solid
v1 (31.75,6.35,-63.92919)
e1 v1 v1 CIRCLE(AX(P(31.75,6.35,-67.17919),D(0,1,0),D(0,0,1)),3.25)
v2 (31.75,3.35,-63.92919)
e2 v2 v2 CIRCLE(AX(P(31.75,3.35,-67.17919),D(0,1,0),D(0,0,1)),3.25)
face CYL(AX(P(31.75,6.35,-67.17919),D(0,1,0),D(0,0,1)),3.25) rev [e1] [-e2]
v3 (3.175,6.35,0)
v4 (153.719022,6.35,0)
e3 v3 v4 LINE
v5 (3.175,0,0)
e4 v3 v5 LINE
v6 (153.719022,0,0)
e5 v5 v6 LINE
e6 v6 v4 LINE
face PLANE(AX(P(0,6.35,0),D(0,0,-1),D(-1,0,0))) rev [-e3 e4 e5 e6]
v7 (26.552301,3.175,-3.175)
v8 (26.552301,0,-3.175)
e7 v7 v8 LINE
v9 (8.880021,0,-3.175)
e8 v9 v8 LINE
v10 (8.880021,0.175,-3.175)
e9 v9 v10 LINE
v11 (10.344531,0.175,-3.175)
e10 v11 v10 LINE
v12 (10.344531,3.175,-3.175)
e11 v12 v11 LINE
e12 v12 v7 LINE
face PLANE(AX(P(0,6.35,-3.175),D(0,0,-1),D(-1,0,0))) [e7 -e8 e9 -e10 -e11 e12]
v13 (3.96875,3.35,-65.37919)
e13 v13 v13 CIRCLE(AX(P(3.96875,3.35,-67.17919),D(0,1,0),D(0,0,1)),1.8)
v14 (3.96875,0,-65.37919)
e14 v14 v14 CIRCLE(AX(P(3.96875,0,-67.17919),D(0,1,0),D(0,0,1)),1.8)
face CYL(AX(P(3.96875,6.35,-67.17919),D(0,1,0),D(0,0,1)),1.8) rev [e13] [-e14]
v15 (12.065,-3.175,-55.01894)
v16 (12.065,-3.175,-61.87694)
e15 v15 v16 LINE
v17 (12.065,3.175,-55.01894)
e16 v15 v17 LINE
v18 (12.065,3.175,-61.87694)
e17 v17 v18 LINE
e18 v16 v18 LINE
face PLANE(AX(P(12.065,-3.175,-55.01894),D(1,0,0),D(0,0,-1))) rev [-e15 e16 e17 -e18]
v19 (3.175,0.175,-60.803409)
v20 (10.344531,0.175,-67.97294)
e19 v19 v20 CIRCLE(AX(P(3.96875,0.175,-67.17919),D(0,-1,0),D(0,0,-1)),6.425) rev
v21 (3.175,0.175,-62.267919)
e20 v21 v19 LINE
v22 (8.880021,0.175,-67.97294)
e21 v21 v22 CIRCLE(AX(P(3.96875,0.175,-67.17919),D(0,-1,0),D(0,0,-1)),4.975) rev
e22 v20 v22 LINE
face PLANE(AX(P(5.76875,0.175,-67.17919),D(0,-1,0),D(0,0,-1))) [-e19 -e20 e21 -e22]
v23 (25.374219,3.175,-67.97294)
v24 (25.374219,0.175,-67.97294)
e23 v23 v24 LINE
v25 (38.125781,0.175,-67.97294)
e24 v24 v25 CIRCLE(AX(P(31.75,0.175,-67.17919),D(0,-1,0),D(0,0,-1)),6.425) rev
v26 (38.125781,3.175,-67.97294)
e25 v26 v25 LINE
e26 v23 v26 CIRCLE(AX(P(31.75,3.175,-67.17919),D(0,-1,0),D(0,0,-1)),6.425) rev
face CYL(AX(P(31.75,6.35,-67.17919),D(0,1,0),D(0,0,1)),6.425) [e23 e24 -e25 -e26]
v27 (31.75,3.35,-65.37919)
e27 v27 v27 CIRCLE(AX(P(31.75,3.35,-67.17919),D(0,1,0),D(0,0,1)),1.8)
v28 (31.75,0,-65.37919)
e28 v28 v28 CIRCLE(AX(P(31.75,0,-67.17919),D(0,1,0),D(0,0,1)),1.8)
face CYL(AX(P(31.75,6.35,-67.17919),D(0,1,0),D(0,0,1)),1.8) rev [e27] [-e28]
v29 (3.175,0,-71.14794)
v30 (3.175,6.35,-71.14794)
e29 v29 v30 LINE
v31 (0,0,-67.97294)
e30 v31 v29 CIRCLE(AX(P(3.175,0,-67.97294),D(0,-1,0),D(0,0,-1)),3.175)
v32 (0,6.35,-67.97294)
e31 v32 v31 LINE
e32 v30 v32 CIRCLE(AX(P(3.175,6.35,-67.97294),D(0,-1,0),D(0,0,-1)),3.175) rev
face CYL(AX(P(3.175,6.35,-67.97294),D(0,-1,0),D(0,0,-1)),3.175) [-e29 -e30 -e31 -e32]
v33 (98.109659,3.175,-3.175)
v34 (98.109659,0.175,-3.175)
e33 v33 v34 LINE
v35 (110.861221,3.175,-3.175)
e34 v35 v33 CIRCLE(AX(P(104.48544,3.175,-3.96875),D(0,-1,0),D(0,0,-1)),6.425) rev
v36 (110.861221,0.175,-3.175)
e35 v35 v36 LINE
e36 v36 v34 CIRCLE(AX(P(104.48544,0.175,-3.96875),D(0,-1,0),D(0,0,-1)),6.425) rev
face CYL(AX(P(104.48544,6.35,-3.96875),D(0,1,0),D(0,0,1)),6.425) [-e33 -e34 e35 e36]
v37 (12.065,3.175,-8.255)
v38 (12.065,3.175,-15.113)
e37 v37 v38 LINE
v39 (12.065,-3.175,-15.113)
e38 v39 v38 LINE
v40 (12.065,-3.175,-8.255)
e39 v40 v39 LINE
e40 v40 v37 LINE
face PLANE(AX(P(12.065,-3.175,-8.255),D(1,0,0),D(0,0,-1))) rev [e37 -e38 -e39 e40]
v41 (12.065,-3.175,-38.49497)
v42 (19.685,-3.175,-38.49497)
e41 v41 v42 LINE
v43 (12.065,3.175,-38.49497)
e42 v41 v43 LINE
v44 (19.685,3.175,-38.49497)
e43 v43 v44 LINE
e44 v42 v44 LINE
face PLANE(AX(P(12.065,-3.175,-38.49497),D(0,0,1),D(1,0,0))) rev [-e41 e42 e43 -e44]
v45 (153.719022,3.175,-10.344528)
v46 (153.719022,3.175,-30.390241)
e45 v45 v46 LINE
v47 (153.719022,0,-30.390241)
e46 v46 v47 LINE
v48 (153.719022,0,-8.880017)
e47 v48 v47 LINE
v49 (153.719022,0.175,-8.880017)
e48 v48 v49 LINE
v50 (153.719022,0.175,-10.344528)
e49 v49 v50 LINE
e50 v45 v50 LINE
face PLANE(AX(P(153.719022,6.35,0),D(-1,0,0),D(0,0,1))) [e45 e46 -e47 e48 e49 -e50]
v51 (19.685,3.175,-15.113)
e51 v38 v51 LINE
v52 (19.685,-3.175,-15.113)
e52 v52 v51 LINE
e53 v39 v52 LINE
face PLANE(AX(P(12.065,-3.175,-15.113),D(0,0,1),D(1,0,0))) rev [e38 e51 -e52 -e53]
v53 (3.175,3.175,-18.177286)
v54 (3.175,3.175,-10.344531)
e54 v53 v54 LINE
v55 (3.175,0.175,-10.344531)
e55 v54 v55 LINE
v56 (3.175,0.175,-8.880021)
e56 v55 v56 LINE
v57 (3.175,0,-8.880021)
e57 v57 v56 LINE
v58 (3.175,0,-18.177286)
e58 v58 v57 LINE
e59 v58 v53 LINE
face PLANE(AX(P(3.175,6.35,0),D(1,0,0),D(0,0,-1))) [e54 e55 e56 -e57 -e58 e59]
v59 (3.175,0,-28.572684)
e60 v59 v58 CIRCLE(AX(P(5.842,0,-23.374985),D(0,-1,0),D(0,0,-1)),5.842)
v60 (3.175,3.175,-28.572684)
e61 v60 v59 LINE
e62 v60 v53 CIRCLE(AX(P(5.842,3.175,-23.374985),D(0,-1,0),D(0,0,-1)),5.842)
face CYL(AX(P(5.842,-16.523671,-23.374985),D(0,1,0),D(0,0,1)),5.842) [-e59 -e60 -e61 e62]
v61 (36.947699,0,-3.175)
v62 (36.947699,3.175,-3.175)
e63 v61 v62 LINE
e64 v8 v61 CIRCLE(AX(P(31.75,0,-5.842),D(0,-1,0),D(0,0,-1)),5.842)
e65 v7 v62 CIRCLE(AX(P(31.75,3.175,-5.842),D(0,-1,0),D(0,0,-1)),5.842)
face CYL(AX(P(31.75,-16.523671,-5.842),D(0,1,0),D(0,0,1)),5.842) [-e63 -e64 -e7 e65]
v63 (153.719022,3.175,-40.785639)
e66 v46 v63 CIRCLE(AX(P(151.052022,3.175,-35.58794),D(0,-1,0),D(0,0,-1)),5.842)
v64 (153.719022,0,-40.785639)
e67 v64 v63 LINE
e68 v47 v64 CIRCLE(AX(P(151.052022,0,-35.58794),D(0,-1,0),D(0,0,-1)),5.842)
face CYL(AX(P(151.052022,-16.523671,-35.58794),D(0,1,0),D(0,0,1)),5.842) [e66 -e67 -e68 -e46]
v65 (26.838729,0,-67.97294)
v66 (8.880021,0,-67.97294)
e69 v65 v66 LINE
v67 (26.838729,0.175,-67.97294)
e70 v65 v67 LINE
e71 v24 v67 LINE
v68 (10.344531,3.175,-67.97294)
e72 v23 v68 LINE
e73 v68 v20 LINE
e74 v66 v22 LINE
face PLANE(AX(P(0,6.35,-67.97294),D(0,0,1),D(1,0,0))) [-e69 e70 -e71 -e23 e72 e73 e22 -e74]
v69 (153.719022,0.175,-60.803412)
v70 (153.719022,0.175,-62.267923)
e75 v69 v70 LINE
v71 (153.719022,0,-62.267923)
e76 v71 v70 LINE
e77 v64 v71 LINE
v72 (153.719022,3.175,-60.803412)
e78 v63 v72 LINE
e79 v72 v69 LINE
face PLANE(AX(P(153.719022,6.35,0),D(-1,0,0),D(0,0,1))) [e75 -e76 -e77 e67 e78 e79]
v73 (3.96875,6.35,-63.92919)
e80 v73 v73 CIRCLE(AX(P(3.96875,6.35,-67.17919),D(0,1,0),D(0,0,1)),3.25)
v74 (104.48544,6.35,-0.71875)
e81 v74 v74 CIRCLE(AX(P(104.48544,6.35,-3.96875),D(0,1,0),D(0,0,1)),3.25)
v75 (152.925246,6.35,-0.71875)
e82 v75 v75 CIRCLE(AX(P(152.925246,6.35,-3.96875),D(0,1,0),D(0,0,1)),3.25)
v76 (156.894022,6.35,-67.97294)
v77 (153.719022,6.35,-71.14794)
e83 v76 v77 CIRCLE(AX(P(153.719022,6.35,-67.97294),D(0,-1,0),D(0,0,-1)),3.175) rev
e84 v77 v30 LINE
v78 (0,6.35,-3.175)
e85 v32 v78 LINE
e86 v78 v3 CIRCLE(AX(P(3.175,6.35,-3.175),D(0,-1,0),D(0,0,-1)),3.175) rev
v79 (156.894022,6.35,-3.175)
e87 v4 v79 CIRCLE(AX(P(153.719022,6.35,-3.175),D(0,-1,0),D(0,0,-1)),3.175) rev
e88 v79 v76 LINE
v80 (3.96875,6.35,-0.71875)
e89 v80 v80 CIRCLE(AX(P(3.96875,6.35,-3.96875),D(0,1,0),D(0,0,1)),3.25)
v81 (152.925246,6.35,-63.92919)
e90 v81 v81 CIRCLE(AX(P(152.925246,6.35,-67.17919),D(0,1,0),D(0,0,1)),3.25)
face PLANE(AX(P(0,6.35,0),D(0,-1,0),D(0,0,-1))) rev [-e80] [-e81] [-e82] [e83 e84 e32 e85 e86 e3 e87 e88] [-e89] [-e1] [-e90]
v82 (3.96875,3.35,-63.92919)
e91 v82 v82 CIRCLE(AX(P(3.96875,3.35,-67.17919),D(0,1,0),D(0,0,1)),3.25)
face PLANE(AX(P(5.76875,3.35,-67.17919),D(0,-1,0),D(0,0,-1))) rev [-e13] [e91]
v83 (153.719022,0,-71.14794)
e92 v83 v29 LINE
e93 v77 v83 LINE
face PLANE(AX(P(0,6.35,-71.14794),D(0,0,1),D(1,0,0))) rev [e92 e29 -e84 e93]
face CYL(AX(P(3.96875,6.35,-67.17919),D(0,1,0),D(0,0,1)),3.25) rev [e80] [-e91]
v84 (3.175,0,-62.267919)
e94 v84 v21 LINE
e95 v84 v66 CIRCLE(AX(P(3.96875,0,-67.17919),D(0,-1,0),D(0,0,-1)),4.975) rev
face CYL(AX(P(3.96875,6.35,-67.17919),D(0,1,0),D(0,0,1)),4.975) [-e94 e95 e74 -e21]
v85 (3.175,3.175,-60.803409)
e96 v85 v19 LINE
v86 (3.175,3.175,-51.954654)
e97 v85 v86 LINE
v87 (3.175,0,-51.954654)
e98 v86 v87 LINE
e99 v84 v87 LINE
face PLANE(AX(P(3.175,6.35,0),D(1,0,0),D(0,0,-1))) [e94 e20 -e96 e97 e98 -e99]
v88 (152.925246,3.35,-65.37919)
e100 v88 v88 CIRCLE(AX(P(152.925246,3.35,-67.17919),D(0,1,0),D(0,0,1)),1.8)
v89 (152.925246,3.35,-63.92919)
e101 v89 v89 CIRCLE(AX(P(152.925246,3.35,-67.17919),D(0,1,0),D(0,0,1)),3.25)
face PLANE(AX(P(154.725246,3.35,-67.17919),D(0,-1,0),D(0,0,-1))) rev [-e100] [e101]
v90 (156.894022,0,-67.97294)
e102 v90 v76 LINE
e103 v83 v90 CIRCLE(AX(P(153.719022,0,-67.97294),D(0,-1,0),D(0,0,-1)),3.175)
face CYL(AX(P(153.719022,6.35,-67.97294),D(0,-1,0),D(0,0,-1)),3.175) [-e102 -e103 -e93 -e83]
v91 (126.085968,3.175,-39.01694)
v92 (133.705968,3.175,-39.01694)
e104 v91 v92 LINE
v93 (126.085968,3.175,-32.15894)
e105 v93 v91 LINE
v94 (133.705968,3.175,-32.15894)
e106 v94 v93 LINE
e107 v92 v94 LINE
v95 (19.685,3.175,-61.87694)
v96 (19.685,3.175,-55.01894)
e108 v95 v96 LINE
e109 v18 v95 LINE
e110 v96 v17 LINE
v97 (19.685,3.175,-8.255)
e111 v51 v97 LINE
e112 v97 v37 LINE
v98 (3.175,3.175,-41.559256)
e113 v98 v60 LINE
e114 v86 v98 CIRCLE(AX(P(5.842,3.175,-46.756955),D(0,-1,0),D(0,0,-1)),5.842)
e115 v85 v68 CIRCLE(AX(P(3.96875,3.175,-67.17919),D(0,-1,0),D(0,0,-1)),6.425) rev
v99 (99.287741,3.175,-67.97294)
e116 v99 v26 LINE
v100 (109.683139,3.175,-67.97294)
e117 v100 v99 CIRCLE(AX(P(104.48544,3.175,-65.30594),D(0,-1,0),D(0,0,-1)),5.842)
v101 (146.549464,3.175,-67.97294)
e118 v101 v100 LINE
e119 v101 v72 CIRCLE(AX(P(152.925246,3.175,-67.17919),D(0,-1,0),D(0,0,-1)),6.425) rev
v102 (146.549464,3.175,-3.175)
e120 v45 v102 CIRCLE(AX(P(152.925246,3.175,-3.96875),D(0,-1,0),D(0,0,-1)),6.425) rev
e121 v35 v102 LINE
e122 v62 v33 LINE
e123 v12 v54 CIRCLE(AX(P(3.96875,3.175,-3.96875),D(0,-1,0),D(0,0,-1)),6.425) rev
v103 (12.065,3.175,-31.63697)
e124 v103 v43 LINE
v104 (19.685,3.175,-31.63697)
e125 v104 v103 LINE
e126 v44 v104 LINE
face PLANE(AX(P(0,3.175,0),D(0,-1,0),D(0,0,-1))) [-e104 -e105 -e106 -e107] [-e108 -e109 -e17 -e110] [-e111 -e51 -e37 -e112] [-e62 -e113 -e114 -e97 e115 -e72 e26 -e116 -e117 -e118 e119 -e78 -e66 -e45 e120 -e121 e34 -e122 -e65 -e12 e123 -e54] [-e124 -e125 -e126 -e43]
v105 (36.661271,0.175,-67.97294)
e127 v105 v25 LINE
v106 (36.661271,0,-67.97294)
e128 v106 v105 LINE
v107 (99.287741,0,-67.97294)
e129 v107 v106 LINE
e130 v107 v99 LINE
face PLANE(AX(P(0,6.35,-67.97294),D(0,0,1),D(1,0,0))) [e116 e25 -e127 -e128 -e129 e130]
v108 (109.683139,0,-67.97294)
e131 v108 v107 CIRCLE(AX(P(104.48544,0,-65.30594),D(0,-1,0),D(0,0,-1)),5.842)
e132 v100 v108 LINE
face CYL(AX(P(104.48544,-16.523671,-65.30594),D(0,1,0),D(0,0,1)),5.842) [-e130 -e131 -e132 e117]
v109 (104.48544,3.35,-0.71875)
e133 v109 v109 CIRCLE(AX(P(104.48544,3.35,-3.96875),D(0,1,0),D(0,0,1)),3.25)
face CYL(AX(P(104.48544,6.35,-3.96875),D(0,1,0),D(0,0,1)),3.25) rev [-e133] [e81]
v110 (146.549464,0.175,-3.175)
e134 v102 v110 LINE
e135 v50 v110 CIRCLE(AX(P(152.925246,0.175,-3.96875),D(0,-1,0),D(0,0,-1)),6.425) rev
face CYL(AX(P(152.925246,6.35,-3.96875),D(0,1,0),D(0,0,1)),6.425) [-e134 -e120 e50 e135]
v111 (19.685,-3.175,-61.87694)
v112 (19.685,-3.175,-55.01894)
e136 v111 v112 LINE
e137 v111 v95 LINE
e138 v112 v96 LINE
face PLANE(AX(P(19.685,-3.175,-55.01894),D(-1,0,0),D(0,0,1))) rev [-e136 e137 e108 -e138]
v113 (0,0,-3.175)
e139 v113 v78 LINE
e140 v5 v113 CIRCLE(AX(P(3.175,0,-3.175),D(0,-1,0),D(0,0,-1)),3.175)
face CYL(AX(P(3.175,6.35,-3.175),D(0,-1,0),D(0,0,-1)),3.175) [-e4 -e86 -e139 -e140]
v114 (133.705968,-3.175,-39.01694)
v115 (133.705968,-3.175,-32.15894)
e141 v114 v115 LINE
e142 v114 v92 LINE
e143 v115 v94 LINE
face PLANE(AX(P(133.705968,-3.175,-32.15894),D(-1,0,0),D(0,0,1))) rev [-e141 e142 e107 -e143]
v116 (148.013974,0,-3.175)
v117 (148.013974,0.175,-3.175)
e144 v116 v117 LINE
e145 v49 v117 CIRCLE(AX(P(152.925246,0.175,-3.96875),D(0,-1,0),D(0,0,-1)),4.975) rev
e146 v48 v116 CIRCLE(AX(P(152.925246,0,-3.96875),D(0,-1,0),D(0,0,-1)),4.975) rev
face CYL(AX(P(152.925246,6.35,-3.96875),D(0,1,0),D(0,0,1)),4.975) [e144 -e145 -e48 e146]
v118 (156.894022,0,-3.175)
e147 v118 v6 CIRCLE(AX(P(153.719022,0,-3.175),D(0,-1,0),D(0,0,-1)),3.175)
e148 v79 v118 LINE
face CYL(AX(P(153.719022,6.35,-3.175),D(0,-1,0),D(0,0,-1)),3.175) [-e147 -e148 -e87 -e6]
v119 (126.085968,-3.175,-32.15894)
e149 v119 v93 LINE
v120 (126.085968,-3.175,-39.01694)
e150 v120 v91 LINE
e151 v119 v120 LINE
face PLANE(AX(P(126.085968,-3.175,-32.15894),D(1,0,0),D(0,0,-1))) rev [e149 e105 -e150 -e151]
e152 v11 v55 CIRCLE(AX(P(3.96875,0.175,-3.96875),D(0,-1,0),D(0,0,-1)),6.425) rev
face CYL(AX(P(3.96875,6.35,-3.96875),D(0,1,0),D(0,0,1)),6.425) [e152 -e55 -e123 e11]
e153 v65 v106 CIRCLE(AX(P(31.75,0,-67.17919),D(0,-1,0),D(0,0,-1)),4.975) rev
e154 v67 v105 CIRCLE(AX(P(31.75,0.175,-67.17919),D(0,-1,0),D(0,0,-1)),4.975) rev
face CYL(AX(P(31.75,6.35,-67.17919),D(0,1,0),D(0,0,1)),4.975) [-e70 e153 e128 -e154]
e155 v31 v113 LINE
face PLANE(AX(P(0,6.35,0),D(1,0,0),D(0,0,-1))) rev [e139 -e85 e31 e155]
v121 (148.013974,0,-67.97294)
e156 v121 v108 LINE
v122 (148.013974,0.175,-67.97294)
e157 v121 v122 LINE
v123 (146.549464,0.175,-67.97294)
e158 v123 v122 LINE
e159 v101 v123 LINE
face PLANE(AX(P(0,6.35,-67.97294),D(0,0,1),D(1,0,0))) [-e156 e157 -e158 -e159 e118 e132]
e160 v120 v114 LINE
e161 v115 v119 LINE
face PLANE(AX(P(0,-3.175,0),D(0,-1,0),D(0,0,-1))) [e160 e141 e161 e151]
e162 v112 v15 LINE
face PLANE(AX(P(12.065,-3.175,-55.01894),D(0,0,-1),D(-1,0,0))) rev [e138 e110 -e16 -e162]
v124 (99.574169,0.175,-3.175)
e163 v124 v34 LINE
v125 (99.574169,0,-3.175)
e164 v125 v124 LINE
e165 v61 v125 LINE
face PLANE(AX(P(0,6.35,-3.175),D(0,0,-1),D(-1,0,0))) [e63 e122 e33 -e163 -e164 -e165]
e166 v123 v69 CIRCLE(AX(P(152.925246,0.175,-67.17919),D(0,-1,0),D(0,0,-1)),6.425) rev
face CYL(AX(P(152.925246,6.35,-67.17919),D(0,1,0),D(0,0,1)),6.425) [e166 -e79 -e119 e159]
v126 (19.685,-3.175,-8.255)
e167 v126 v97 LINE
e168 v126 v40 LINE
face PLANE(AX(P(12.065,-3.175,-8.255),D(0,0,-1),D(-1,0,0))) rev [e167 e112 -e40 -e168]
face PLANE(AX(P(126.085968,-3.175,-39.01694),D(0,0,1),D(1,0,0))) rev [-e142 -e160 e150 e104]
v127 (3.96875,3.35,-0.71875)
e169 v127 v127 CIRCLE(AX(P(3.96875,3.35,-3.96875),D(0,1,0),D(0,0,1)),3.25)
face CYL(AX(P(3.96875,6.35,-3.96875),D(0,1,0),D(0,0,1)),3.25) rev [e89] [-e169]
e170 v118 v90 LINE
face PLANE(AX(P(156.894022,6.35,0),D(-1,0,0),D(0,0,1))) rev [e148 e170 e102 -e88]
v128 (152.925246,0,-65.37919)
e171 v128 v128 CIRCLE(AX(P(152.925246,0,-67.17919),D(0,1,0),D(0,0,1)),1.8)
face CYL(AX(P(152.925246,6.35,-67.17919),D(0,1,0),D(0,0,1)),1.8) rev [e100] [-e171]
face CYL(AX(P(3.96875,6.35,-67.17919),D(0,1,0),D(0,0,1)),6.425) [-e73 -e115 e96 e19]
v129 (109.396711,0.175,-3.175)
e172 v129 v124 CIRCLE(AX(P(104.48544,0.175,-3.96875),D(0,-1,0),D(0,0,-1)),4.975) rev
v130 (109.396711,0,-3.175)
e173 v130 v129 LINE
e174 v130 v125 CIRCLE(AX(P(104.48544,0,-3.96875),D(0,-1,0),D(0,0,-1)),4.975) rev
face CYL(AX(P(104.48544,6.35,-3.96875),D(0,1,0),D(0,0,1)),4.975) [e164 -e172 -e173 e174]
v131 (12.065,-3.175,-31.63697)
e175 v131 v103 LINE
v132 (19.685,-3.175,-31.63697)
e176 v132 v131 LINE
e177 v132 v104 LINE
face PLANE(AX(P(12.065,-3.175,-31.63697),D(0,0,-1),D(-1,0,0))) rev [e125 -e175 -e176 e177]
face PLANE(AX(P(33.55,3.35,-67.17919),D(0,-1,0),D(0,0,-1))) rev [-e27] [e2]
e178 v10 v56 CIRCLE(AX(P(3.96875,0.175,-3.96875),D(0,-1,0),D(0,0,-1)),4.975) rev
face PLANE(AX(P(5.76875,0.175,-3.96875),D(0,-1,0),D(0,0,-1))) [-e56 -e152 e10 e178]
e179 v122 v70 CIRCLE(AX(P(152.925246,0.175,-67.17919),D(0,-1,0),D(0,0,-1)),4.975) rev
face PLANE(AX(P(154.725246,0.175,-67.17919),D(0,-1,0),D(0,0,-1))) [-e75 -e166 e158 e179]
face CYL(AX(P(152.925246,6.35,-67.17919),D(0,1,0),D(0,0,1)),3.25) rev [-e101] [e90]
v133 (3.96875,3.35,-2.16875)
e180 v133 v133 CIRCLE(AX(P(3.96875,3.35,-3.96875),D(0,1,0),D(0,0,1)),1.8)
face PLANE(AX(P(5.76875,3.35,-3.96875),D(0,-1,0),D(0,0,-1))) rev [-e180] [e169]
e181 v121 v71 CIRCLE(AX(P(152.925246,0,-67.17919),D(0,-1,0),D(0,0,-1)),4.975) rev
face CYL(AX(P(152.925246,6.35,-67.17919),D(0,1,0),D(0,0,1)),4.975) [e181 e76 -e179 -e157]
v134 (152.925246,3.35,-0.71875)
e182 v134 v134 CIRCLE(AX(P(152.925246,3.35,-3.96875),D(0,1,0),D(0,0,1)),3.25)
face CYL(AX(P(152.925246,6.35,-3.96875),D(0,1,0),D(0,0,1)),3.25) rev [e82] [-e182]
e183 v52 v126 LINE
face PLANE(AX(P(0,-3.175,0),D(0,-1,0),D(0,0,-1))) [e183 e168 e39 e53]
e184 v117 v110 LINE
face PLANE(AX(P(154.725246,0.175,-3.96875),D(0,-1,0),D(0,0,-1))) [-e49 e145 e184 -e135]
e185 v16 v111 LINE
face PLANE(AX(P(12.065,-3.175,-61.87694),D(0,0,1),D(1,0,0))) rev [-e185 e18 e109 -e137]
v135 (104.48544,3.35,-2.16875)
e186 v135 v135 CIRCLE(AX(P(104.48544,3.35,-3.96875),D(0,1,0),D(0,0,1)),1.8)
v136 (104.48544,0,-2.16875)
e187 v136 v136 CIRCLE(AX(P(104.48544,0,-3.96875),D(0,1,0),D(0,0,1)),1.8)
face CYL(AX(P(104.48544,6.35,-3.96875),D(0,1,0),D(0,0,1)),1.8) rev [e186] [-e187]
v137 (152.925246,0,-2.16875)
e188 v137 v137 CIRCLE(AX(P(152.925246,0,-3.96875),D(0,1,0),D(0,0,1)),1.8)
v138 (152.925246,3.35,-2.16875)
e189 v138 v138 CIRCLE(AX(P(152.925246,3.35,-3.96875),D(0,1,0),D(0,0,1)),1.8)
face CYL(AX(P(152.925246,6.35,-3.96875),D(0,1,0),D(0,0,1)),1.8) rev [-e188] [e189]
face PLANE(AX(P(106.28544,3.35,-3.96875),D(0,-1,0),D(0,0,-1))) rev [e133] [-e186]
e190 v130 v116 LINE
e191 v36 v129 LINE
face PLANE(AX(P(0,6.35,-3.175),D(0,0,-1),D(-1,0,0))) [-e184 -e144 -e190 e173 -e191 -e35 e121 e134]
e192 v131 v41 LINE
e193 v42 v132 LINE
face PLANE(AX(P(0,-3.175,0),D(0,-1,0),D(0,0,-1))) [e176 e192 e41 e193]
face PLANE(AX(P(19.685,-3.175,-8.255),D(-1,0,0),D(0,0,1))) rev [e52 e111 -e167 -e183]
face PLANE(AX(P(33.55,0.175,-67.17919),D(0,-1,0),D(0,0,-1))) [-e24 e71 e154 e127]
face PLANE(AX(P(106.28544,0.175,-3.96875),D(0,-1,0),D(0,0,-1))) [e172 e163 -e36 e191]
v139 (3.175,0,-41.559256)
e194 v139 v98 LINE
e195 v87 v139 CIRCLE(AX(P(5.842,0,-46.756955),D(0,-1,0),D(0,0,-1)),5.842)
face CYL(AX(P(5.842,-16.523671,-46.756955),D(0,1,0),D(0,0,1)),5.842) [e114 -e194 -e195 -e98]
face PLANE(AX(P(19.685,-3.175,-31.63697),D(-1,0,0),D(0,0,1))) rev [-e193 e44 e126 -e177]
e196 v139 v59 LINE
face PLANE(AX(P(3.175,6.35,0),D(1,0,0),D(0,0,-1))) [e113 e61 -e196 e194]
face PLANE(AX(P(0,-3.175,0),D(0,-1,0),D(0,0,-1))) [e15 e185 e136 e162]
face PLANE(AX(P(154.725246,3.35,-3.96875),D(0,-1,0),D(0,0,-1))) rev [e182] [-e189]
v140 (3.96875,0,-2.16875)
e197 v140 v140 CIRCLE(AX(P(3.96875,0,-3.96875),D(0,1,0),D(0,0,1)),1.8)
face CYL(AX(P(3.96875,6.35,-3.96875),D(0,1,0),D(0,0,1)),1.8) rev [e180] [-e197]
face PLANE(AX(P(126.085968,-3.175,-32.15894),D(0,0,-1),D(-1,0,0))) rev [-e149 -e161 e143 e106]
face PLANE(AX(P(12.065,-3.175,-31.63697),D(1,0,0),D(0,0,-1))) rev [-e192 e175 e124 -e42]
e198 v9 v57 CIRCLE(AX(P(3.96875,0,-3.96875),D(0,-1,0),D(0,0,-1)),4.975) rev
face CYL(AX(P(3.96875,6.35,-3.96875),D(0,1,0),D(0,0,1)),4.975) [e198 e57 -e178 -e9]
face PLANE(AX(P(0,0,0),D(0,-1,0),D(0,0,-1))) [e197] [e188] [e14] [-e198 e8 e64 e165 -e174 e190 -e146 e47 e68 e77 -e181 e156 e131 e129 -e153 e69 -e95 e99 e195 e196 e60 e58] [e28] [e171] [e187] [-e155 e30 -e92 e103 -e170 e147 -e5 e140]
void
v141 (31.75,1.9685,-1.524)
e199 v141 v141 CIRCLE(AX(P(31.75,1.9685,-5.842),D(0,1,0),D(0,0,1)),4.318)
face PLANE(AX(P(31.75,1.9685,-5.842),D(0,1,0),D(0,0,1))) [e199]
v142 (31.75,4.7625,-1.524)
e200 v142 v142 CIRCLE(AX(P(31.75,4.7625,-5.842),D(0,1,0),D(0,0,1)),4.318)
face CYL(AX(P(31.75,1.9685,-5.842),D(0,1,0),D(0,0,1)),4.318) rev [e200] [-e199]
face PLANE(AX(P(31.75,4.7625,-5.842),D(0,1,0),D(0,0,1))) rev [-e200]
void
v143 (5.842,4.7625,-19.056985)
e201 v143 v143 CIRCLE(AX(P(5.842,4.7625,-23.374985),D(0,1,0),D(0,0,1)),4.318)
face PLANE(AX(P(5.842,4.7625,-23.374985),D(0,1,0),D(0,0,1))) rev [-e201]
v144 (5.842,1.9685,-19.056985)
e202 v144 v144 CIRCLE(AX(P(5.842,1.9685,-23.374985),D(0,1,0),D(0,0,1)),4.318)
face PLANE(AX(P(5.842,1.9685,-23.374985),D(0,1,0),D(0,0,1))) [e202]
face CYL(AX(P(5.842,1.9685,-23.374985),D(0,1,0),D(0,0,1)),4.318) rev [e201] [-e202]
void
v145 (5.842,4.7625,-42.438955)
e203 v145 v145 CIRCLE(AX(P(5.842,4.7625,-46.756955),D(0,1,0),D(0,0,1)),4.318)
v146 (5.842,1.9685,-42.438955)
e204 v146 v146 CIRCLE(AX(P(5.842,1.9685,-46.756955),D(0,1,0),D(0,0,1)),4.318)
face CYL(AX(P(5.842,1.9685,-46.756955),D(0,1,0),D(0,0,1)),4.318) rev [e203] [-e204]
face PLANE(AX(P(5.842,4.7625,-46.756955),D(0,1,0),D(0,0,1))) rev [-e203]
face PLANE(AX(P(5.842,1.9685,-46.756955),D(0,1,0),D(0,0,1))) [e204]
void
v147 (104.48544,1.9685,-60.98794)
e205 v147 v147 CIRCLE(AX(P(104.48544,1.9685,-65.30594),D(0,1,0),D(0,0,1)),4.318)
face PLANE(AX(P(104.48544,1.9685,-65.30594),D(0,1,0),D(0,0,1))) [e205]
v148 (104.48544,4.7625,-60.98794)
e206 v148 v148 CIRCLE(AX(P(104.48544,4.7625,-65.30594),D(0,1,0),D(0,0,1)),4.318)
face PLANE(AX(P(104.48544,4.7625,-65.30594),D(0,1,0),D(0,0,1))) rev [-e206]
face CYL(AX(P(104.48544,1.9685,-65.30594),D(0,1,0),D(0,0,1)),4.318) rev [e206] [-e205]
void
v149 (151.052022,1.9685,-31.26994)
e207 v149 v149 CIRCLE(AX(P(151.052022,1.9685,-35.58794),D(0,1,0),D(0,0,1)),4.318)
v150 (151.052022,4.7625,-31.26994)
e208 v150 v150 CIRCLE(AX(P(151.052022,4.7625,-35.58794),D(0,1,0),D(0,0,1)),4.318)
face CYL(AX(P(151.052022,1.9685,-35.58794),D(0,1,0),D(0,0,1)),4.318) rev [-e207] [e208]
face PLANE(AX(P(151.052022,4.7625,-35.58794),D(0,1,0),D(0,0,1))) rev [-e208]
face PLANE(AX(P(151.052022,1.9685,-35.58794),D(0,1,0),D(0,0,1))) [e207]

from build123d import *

# Parameters (mm, degrees)
SKETCH1_W                      = 156.894022
SKETCH1_H                      = 71.14794
BOSS_EXTRUDE1_DEPTH            = 6.35
FILLET1_R                      = 3.175
CBORE_FOR_M3_SHCS1_D           = 3.6
CBORE_FOR_M3_SHCS1_CBORE_D     = 6.5
CBORE_FOR_M3_SHCS1_CBORE_DEPTH = 3
SHELL1_DEPTH                   = 3.175
SHELL1_2_DEPTH                 = 0.175
SKETCH8_W                      = 7.62
SKETCH8_H                      = 6.858
BOSS_EXTRUDE2_DEPTH            = 6.35
SKETCH9_R                      = 5.842
BOSS_EXTRUDE3_DEPTH            = 3.175
CUT_EXTRUDE2_START             = -1.5875
SKETCH10_R                     = 4.318
CUT_EXTRUDE2_DEPTH             = 2.794


# Read off the part's stored shape, not the designer's step: Shell1
with BuildPart() as part:
    # Sketch1 → Boss-Extrude1 (new body)
    with BuildSketch(Plane(origin=(0, 0, 0), x_dir=(1, 0, 0), z_dir=(0, 1, 0))):
        with Locations((78.447011, 35.57397)):
            Rectangle(SKETCH1_W, SKETCH1_H)
    extrude(amount=BOSS_EXTRUDE1_DEPTH)

    # Fillet1
    fillet1_edges = [part.edges().sort_by_distance(p)[0] for p in [
        (0, 3.175, -71.14794),
        (156.894022, 3.175, -71.14794),
        (156.894022, 3.175, 0),
        (0, 3.175, 0),
    ]]
    fillet(fillet1_edges, radius=FILLET1_R)

    # CBORE for M3 SHCS1 (through all)
    with Locations(Plane(origin=(0, 6.35, 0), x_dir=(1, 0, 0), z_dir=(0, 1, 0))):
        with Locations((3.96875, 67.17919), (31.75, 67.17919), (152.92524554, 67.17919), (3.96875, 3.96875), (104.48544, 3.96875), (152.92524554, 3.96875)):
            CounterBoreHole(CBORE_FOR_M3_SHCS1_D / 2, CBORE_FOR_M3_SHCS1_CBORE_D / 2, CBORE_FOR_M3_SHCS1_CBORE_DEPTH)

    # Shell1 outline → Shell1 (cut)
    with BuildSketch(Plane(origin=(0, 0, 0), x_dir=(1, 0, 0), z_dir=(0, 1, 0))):
        with BuildLine():
            Line((25.374218798, 67.97294), (10.344531202, 67.97294))
            ThreePointArc((10.344531202, 67.97294), (8.511911069, 62.636028931), (3.175, 60.803408798))
            Line((3.175, 60.803408798), (3.175, 10.344531202))
            ThreePointArc((3.175, 10.344531202), (8.511911069, 8.511911069), (10.344531202, 3.175))
            Line((10.344531202, 3.175), (98.109658798, 3.175))
            ThreePointArc((98.109658798, 3.175), (104.48544, 10.39375), (110.861221202, 3.175))
            Line((110.861221202, 3.175), (146.549464337, 3.175))
            ThreePointArc((146.549464337, 3.175), (148.382093898, 8.511920497), (153.719022, 10.344527908))
            Line((153.719022, 10.344527908), (153.719022, 60.803412092))
            ThreePointArc((153.719022, 60.803412092), (148.382093898, 62.636019503), (146.549464337, 67.97294))
            Line((146.549464337, 67.97294), (38.125781202, 67.97294))
            ThreePointArc((38.125781202, 67.97294), (31.75, 60.75419), (25.374218798, 67.97294))
        make_face()
    extrude(amount=SHELL1_DEPTH, mode=Mode.SUBTRACT)

    # Shell1 2 outline → Shell1 2 (cut)
    with BuildSketch(Plane(origin=(0, 0, 0), x_dir=(1, 0, 0), z_dir=(0, 1, 0))):
        with BuildLine():
            Line((10.344531202, 67.97294), (8.880021316, 67.97294))
            ThreePointArc((8.880021316, 67.97294), (7.486606236, 63.661333764), (3.175, 62.267918684))
            Line((3.175, 62.267918684), (3.175, 60.803408798))
            ThreePointArc((3.175, 60.803408798), (8.511911069, 62.636028931), (10.344531202, 67.97294))
        make_face()
        with BuildLine():
            Line((26.838728684, 67.97294), (25.374218798, 67.97294))
            ThreePointArc((25.374218798, 67.97294), (31.75, 60.75419), (38.125781202, 67.97294))
            Line((38.125781202, 67.97294), (36.661271316, 67.97294))
            ThreePointArc((36.661271316, 67.97294), (31.75, 62.20419), (26.838728684, 67.97294))
        make_face()
        with BuildLine():
            ThreePointArc((10.344531202, 3.175), (8.511911069, 8.511911069), (3.175, 10.344531202))
            Line((3.175, 10.344531202), (3.175, 8.880021316))
            ThreePointArc((3.175, 8.880021316), (7.486606236, 7.486606236), (8.880021316, 3.175))
            Line((8.880021316, 3.175), (10.344531202, 3.175))
        make_face()
        with BuildLine():
            Line((148.013974224, 67.97294), (146.549464337, 67.97294))
            ThreePointArc((146.549464337, 67.97294), (148.382093898, 62.636019503), (153.719022, 60.803412092))
            Line((153.719022, 60.803412092), (153.719022, 62.267922961))
            ThreePointArc((153.719022, 62.267922961), (149.40739878, 63.661324287), (148.013974224, 67.97294))
        make_face()
        with BuildLine():
            ThreePointArc((110.861221202, 3.175), (104.48544, 10.39375), (98.109658798, 3.175))
            Line((98.109658798, 3.175), (99.574168684, 3.175))
            ThreePointArc((99.574168684, 3.175), (104.48544, 8.94375), (109.396711316, 3.175))
            Line((109.396711316, 3.175), (110.861221202, 3.175))
        make_face()
        with BuildLine():
            Line((153.719022, 8.880017039), (153.719022, 10.344527908))
            ThreePointArc((153.719022, 10.344527908), (148.382093898, 8.511920497), (146.549464337, 3.175))
            Line((146.549464337, 3.175), (148.013974224, 3.175))
            ThreePointArc((148.013974224, 3.175), (149.40739878, 7.486615713), (153.719022, 8.880017039))
        make_face()
    extrude(amount=SHELL1_2_DEPTH, mode=Mode.SUBTRACT)

    # Sketch8 → Boss-Extrude2 (add)
    with BuildSketch(Plane.XZ.offset(-3.175)):
        with Locations((15.875, -11.684)):
            Rectangle(SKETCH8_W, SKETCH8_H)
        with Locations((15.875, -35.06597)):
            Rectangle(SKETCH8_W, SKETCH8_H)
        with Locations((15.875, -58.44794)):
            Rectangle(SKETCH8_W, SKETCH8_H)
        with Locations((129.89596777, -35.58794)):
            Rectangle(SKETCH8_W, SKETCH8_H)
    extrude(amount=BOSS_EXTRUDE2_DEPTH)

    # Sketch9 → Boss-Extrude3 (add)
    with BuildSketch(Plane.XZ.offset(-3.175)):
        with Locations((5.842, -23.374985)):
            Circle(SKETCH9_R)
        with Locations((5.842, -46.756955)):
            Circle(SKETCH9_R)
        with Locations((31.75, -5.842)):
            Circle(SKETCH9_R)
        with Locations((104.48544, -65.30594)):
            Circle(SKETCH9_R)
        with Locations((151.052022, -35.58794)):
            Circle(SKETCH9_R)
    extrude(amount=BOSS_EXTRUDE3_DEPTH)

    # Sketch10 → Cut-Extrude2 (cut)
    with BuildSketch(Plane(origin=(0, 6.35, 0), x_dir=(1, 0, 0), z_dir=(0, 1, 0)).offset(CUT_EXTRUDE2_START)):
        with Locations(Location((31.75, 5.842, 0), (0, 0, 270))):
            Circle(SKETCH10_R)
        with Locations(Location((5.842, 23.374985, 0), (0, 0, 270))):
            Circle(SKETCH10_R)
        with Locations(Location((5.842, 46.756955, 0), (0, 0, 270))):
            Circle(SKETCH10_R)
        with Locations(Location((104.48544, 65.30594, 0), (0, 0, 270))):
            Circle(SKETCH10_R)
        with Locations(Location((151.052022, 35.58794, 0), (0, 0, 270))):
            Circle(SKETCH10_R)
    extrude(amount=-CUT_EXTRUDE2_DEPTH, mode=Mode.SUBTRACT)


solid = part.part
